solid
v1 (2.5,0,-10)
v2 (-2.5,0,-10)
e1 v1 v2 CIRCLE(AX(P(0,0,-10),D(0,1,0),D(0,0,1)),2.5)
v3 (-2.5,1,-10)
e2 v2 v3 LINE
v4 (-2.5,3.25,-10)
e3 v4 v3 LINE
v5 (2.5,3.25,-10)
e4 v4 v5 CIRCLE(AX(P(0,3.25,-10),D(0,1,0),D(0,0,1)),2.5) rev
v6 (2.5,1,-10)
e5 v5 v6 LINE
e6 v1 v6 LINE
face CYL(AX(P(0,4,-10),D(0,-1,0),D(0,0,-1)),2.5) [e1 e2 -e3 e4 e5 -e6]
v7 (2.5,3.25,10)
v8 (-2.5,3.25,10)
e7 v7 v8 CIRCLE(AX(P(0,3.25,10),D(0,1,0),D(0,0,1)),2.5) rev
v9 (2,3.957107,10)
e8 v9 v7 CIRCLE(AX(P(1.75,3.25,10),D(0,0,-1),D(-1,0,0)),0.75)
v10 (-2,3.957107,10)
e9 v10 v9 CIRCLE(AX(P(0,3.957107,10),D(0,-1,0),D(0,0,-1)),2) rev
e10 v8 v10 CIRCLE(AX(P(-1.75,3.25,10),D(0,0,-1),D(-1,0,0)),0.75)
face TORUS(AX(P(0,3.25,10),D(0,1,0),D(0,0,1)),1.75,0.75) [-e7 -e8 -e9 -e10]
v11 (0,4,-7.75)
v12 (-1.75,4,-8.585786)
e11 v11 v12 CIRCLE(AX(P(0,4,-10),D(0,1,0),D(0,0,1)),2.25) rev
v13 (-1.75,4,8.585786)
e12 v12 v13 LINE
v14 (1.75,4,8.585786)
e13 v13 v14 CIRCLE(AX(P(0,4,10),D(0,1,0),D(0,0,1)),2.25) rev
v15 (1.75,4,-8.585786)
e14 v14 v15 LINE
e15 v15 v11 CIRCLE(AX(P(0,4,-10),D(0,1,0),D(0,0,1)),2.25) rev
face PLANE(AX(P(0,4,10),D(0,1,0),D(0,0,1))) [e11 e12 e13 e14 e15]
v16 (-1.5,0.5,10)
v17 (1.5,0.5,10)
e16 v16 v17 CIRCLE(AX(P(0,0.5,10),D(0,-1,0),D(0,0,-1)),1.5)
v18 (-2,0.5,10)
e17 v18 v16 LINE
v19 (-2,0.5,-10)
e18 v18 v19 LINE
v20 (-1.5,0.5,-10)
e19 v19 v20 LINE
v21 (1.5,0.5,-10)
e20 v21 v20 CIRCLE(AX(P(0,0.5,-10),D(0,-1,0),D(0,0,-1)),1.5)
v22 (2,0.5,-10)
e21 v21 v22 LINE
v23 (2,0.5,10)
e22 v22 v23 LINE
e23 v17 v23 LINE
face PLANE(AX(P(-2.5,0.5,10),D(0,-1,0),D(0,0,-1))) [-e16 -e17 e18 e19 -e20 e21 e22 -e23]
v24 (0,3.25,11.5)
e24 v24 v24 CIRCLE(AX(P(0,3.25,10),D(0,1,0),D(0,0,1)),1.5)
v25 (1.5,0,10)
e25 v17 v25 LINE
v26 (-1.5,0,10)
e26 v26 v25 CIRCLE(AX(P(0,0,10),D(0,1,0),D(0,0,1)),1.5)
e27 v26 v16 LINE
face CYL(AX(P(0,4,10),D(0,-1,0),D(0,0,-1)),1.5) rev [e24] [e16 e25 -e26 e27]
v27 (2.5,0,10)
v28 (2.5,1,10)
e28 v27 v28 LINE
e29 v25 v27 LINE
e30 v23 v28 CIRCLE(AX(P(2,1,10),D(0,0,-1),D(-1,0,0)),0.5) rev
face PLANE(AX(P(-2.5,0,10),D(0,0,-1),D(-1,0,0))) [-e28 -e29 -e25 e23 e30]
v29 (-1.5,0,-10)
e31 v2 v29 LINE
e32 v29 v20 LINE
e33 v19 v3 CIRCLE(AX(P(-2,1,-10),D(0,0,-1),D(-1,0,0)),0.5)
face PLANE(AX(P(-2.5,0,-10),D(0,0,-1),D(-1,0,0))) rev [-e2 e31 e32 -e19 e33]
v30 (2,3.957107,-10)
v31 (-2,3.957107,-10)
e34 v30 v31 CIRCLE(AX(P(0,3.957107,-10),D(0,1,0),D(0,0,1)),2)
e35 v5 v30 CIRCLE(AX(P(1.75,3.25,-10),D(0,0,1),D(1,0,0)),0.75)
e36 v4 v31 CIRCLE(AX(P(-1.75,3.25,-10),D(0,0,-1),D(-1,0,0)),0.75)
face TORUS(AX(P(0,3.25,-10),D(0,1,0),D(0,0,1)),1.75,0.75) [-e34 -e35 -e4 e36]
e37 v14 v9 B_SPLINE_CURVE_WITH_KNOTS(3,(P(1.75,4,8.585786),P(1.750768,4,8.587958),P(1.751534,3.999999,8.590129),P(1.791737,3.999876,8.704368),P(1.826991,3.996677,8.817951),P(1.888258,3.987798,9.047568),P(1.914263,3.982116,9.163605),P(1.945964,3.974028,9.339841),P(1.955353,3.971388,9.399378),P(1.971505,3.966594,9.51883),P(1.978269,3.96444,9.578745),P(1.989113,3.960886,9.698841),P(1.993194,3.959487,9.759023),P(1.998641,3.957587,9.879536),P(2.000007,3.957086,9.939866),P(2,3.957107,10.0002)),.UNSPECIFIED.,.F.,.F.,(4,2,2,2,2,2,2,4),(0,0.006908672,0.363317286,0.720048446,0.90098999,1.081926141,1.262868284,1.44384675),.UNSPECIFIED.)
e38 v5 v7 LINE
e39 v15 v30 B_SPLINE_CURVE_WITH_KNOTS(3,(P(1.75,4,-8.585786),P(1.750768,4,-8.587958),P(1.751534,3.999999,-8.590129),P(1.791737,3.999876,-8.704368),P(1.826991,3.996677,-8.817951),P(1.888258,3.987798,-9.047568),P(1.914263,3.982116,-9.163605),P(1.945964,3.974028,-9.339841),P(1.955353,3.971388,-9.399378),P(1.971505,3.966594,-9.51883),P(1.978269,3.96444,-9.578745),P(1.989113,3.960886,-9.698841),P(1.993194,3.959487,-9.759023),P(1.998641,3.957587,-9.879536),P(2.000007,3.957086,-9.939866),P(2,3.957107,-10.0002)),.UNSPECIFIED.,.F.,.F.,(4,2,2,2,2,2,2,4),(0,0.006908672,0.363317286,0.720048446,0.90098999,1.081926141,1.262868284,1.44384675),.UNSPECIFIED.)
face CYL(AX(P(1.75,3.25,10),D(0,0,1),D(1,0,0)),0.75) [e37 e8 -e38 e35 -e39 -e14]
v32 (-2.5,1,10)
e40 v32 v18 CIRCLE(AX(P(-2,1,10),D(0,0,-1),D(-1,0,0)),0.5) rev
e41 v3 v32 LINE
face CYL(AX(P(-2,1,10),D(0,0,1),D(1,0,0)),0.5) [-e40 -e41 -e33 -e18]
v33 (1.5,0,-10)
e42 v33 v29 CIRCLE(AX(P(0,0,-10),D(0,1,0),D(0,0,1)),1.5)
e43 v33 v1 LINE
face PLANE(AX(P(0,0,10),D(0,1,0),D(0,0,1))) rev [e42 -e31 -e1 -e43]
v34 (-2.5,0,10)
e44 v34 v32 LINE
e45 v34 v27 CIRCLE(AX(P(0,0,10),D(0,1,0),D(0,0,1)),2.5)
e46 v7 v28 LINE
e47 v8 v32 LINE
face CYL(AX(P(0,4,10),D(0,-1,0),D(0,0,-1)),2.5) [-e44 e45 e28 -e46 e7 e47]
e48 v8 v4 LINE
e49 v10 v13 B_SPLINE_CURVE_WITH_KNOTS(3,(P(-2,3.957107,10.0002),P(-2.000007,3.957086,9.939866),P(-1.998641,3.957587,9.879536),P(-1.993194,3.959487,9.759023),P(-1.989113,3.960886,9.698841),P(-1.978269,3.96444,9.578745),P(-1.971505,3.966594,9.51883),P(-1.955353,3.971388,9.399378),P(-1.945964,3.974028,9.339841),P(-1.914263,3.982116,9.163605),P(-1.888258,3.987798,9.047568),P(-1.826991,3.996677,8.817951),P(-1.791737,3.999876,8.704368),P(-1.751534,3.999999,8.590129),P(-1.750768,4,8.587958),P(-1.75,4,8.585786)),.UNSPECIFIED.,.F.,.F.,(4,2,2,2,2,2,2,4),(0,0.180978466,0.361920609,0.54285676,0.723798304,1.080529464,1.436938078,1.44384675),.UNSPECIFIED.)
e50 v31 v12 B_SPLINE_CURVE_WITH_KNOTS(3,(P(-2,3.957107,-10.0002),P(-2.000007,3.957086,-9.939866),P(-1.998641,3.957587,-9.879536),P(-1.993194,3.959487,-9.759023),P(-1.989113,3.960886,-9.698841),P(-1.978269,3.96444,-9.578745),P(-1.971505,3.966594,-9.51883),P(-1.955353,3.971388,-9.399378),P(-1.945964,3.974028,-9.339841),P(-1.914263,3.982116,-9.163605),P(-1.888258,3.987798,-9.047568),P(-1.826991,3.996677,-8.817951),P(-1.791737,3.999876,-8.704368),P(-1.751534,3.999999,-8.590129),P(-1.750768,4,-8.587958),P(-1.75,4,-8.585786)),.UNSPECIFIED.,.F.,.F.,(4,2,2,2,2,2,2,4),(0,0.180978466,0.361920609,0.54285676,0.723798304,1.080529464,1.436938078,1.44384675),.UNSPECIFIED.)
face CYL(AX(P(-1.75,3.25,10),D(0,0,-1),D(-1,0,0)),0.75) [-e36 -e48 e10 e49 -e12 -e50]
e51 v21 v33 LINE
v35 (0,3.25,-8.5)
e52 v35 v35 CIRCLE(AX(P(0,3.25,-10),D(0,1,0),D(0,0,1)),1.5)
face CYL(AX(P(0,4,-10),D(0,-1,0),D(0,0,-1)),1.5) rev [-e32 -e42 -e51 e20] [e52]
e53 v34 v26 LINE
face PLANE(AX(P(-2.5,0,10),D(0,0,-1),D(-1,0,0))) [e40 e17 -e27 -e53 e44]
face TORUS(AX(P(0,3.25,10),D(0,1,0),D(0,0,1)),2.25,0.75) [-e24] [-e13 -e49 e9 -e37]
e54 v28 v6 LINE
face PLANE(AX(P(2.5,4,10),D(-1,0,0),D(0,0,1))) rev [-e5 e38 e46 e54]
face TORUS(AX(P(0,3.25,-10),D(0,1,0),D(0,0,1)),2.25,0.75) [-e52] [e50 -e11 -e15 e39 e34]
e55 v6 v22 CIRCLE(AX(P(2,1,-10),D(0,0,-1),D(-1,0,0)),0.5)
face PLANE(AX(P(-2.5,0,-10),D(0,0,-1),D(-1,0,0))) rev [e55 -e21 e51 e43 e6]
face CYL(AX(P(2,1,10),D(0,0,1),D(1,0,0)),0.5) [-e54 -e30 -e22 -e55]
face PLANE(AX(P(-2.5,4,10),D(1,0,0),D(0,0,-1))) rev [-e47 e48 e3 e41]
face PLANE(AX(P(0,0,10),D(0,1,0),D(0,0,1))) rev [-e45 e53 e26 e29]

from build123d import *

# Parameters (mm, degrees)
SKETCH1_R           = 1.5
BOSS_EXTRUDE1_DEPTH = 4
SKETCH2_W           = 20
SKETCH2_H           = 0.5
CUT_EXTRUDE1_DEPTH  = 15.044571905
FILLET1_R           = 0.5
FILLET2_R           = 0.75


with BuildPart() as part:
    # Sketch1 → Boss-Extrude1 (new body)
    with BuildSketch(Plane(origin=(0, 0, 0), x_dir=(1, 0, 0), z_dir=(0, 1, 0))):
        with BuildLine():
            Line((-2.5, -10), (-2.5, 10))
            ThreePointArc((-2.5, 10), (0, 12.5), (2.5, 10))
            Line((2.5, 10), (2.5, -10))
            ThreePointArc((2.5, -10), (0, -12.5), (-2.5, -10))
        make_face()
        with Locations(Location((0, -10, 0), (0, 0, 270))):
            Circle(SKETCH1_R, mode=Mode.SUBTRACT)
        with Locations(Location((0, 10, 0), (0, 0, 270))):
            Circle(SKETCH1_R, mode=Mode.SUBTRACT)
    extrude(amount=BOSS_EXTRUDE1_DEPTH)

    # Sketch2 → Cut-Extrude1 (cut, through all)
    with BuildSketch(Plane(origin=(2.5, 0, 0), x_dir=(0, 0, -1), z_dir=(1, 0, 0))):
        with Locations((0, 0.25)):
            Rectangle(SKETCH2_W, SKETCH2_H)
    extrude(amount=-CUT_EXTRUDE1_DEPTH, mode=Mode.SUBTRACT)

    # Fillet1
    fillet1_edges = [part.edges().sort_by_distance(p)[0] for p in [
        (2.5, 0.5, 0),
        (-2.5, 0.5, 0),
    ]]
    fillet(fillet1_edges, radius=FILLET1_R)

    # Fillet2
    # the kernel refuses this fillet: 0.75 mm, written as the material it takes off along each edge
    with BuildSketch(Plane(origin=(0, 4, 10), x_dir=(0, 0, 1), z_dir=(-1, 0, 0))) as fillet2_piece_1:
        with BuildLine():
            CenterArc((1.5 + FILLET2_R, -FILLET2_R), FILLET2_R, 90, 90)
            Line((1.5 + FILLET2_R, 0), (1.5, 0))
            Line((1.5, 0), (1.5, -FILLET2_R))
        make_face()
    revolve(axis=Axis((0, 4, 10), (0, 1, 0)), mode=Mode.SUBTRACT)
    with BuildSketch(Plane(origin=(0, 4, -10), x_dir=(-1, 0, 0), z_dir=(0, 0, 1))) as fillet2_piece_2:
        with BuildLine():
            CenterArc((2.5 - FILLET2_R, FILLET2_R), FILLET2_R, 270, 90)
            Line((2.5 - FILLET2_R, 0), (2.5, 0))
            Line((2.5, 0), (2.5, FILLET2_R))
        make_face()
    revolve(axis=Axis((0, 4, -10), (0, -1, 0)), revolution_arc=180, mode=Mode.SUBTRACT)
    with BuildSketch(Plane(origin=(0, 4, -10), x_dir=(0, 0, 1), z_dir=(-1, 0, 0))) as fillet2_piece_3:
        with BuildLine():
            CenterArc((1.5 + FILLET2_R, -FILLET2_R), FILLET2_R, 90, 90)
            Line((1.5 + FILLET2_R, 0), (1.5, 0))
            Line((1.5, 0), (1.5, -FILLET2_R))
        make_face()
    revolve(axis=Axis((0, 4, -10), (0, 1, 0)), mode=Mode.SUBTRACT)
    with BuildSketch(Plane(origin=(-2.5, 4, 10), x_dir=(1, 0, 0), z_dir=(0, 0, -1))) as fillet2_piece_4:
        with BuildLine():
            CenterArc((FILLET2_R, FILLET2_R), FILLET2_R, 180, 90)
            Line((0, FILLET2_R), (0, 0))
            Line((0, 0), (FILLET2_R, 0))
        make_face()
    extrude(amount=20, mode=Mode.SUBTRACT)
    with BuildSketch(Plane(origin=(0, 4, 10), x_dir=(1, 0, 0), z_dir=(0, 0, -1))) as fillet2_piece_5:
        with BuildLine():
            CenterArc((2.5 - FILLET2_R, FILLET2_R), FILLET2_R, 270, 90)
            Line((2.5 - FILLET2_R, 0), (2.5, 0))
            Line((2.5, 0), (2.5, FILLET2_R))
        make_face()
    revolve(axis=Axis((0, 4, 10), (0, -1, 0)), revolution_arc=180, mode=Mode.SUBTRACT)
    with BuildSketch(Plane(origin=(2.5, 4, -10), x_dir=(0, -1, 0), z_dir=(0, 0, 1))) as fillet2_piece_6:
        with BuildLine():
            CenterArc((FILLET2_R, -FILLET2_R), FILLET2_R, 90, 90)
            Line((0, -FILLET2_R), (0, 0))
            Line((0, 0), (FILLET2_R, 0))
        make_face()
    extrude(amount=20, mode=Mode.SUBTRACT)


solid = part.part
